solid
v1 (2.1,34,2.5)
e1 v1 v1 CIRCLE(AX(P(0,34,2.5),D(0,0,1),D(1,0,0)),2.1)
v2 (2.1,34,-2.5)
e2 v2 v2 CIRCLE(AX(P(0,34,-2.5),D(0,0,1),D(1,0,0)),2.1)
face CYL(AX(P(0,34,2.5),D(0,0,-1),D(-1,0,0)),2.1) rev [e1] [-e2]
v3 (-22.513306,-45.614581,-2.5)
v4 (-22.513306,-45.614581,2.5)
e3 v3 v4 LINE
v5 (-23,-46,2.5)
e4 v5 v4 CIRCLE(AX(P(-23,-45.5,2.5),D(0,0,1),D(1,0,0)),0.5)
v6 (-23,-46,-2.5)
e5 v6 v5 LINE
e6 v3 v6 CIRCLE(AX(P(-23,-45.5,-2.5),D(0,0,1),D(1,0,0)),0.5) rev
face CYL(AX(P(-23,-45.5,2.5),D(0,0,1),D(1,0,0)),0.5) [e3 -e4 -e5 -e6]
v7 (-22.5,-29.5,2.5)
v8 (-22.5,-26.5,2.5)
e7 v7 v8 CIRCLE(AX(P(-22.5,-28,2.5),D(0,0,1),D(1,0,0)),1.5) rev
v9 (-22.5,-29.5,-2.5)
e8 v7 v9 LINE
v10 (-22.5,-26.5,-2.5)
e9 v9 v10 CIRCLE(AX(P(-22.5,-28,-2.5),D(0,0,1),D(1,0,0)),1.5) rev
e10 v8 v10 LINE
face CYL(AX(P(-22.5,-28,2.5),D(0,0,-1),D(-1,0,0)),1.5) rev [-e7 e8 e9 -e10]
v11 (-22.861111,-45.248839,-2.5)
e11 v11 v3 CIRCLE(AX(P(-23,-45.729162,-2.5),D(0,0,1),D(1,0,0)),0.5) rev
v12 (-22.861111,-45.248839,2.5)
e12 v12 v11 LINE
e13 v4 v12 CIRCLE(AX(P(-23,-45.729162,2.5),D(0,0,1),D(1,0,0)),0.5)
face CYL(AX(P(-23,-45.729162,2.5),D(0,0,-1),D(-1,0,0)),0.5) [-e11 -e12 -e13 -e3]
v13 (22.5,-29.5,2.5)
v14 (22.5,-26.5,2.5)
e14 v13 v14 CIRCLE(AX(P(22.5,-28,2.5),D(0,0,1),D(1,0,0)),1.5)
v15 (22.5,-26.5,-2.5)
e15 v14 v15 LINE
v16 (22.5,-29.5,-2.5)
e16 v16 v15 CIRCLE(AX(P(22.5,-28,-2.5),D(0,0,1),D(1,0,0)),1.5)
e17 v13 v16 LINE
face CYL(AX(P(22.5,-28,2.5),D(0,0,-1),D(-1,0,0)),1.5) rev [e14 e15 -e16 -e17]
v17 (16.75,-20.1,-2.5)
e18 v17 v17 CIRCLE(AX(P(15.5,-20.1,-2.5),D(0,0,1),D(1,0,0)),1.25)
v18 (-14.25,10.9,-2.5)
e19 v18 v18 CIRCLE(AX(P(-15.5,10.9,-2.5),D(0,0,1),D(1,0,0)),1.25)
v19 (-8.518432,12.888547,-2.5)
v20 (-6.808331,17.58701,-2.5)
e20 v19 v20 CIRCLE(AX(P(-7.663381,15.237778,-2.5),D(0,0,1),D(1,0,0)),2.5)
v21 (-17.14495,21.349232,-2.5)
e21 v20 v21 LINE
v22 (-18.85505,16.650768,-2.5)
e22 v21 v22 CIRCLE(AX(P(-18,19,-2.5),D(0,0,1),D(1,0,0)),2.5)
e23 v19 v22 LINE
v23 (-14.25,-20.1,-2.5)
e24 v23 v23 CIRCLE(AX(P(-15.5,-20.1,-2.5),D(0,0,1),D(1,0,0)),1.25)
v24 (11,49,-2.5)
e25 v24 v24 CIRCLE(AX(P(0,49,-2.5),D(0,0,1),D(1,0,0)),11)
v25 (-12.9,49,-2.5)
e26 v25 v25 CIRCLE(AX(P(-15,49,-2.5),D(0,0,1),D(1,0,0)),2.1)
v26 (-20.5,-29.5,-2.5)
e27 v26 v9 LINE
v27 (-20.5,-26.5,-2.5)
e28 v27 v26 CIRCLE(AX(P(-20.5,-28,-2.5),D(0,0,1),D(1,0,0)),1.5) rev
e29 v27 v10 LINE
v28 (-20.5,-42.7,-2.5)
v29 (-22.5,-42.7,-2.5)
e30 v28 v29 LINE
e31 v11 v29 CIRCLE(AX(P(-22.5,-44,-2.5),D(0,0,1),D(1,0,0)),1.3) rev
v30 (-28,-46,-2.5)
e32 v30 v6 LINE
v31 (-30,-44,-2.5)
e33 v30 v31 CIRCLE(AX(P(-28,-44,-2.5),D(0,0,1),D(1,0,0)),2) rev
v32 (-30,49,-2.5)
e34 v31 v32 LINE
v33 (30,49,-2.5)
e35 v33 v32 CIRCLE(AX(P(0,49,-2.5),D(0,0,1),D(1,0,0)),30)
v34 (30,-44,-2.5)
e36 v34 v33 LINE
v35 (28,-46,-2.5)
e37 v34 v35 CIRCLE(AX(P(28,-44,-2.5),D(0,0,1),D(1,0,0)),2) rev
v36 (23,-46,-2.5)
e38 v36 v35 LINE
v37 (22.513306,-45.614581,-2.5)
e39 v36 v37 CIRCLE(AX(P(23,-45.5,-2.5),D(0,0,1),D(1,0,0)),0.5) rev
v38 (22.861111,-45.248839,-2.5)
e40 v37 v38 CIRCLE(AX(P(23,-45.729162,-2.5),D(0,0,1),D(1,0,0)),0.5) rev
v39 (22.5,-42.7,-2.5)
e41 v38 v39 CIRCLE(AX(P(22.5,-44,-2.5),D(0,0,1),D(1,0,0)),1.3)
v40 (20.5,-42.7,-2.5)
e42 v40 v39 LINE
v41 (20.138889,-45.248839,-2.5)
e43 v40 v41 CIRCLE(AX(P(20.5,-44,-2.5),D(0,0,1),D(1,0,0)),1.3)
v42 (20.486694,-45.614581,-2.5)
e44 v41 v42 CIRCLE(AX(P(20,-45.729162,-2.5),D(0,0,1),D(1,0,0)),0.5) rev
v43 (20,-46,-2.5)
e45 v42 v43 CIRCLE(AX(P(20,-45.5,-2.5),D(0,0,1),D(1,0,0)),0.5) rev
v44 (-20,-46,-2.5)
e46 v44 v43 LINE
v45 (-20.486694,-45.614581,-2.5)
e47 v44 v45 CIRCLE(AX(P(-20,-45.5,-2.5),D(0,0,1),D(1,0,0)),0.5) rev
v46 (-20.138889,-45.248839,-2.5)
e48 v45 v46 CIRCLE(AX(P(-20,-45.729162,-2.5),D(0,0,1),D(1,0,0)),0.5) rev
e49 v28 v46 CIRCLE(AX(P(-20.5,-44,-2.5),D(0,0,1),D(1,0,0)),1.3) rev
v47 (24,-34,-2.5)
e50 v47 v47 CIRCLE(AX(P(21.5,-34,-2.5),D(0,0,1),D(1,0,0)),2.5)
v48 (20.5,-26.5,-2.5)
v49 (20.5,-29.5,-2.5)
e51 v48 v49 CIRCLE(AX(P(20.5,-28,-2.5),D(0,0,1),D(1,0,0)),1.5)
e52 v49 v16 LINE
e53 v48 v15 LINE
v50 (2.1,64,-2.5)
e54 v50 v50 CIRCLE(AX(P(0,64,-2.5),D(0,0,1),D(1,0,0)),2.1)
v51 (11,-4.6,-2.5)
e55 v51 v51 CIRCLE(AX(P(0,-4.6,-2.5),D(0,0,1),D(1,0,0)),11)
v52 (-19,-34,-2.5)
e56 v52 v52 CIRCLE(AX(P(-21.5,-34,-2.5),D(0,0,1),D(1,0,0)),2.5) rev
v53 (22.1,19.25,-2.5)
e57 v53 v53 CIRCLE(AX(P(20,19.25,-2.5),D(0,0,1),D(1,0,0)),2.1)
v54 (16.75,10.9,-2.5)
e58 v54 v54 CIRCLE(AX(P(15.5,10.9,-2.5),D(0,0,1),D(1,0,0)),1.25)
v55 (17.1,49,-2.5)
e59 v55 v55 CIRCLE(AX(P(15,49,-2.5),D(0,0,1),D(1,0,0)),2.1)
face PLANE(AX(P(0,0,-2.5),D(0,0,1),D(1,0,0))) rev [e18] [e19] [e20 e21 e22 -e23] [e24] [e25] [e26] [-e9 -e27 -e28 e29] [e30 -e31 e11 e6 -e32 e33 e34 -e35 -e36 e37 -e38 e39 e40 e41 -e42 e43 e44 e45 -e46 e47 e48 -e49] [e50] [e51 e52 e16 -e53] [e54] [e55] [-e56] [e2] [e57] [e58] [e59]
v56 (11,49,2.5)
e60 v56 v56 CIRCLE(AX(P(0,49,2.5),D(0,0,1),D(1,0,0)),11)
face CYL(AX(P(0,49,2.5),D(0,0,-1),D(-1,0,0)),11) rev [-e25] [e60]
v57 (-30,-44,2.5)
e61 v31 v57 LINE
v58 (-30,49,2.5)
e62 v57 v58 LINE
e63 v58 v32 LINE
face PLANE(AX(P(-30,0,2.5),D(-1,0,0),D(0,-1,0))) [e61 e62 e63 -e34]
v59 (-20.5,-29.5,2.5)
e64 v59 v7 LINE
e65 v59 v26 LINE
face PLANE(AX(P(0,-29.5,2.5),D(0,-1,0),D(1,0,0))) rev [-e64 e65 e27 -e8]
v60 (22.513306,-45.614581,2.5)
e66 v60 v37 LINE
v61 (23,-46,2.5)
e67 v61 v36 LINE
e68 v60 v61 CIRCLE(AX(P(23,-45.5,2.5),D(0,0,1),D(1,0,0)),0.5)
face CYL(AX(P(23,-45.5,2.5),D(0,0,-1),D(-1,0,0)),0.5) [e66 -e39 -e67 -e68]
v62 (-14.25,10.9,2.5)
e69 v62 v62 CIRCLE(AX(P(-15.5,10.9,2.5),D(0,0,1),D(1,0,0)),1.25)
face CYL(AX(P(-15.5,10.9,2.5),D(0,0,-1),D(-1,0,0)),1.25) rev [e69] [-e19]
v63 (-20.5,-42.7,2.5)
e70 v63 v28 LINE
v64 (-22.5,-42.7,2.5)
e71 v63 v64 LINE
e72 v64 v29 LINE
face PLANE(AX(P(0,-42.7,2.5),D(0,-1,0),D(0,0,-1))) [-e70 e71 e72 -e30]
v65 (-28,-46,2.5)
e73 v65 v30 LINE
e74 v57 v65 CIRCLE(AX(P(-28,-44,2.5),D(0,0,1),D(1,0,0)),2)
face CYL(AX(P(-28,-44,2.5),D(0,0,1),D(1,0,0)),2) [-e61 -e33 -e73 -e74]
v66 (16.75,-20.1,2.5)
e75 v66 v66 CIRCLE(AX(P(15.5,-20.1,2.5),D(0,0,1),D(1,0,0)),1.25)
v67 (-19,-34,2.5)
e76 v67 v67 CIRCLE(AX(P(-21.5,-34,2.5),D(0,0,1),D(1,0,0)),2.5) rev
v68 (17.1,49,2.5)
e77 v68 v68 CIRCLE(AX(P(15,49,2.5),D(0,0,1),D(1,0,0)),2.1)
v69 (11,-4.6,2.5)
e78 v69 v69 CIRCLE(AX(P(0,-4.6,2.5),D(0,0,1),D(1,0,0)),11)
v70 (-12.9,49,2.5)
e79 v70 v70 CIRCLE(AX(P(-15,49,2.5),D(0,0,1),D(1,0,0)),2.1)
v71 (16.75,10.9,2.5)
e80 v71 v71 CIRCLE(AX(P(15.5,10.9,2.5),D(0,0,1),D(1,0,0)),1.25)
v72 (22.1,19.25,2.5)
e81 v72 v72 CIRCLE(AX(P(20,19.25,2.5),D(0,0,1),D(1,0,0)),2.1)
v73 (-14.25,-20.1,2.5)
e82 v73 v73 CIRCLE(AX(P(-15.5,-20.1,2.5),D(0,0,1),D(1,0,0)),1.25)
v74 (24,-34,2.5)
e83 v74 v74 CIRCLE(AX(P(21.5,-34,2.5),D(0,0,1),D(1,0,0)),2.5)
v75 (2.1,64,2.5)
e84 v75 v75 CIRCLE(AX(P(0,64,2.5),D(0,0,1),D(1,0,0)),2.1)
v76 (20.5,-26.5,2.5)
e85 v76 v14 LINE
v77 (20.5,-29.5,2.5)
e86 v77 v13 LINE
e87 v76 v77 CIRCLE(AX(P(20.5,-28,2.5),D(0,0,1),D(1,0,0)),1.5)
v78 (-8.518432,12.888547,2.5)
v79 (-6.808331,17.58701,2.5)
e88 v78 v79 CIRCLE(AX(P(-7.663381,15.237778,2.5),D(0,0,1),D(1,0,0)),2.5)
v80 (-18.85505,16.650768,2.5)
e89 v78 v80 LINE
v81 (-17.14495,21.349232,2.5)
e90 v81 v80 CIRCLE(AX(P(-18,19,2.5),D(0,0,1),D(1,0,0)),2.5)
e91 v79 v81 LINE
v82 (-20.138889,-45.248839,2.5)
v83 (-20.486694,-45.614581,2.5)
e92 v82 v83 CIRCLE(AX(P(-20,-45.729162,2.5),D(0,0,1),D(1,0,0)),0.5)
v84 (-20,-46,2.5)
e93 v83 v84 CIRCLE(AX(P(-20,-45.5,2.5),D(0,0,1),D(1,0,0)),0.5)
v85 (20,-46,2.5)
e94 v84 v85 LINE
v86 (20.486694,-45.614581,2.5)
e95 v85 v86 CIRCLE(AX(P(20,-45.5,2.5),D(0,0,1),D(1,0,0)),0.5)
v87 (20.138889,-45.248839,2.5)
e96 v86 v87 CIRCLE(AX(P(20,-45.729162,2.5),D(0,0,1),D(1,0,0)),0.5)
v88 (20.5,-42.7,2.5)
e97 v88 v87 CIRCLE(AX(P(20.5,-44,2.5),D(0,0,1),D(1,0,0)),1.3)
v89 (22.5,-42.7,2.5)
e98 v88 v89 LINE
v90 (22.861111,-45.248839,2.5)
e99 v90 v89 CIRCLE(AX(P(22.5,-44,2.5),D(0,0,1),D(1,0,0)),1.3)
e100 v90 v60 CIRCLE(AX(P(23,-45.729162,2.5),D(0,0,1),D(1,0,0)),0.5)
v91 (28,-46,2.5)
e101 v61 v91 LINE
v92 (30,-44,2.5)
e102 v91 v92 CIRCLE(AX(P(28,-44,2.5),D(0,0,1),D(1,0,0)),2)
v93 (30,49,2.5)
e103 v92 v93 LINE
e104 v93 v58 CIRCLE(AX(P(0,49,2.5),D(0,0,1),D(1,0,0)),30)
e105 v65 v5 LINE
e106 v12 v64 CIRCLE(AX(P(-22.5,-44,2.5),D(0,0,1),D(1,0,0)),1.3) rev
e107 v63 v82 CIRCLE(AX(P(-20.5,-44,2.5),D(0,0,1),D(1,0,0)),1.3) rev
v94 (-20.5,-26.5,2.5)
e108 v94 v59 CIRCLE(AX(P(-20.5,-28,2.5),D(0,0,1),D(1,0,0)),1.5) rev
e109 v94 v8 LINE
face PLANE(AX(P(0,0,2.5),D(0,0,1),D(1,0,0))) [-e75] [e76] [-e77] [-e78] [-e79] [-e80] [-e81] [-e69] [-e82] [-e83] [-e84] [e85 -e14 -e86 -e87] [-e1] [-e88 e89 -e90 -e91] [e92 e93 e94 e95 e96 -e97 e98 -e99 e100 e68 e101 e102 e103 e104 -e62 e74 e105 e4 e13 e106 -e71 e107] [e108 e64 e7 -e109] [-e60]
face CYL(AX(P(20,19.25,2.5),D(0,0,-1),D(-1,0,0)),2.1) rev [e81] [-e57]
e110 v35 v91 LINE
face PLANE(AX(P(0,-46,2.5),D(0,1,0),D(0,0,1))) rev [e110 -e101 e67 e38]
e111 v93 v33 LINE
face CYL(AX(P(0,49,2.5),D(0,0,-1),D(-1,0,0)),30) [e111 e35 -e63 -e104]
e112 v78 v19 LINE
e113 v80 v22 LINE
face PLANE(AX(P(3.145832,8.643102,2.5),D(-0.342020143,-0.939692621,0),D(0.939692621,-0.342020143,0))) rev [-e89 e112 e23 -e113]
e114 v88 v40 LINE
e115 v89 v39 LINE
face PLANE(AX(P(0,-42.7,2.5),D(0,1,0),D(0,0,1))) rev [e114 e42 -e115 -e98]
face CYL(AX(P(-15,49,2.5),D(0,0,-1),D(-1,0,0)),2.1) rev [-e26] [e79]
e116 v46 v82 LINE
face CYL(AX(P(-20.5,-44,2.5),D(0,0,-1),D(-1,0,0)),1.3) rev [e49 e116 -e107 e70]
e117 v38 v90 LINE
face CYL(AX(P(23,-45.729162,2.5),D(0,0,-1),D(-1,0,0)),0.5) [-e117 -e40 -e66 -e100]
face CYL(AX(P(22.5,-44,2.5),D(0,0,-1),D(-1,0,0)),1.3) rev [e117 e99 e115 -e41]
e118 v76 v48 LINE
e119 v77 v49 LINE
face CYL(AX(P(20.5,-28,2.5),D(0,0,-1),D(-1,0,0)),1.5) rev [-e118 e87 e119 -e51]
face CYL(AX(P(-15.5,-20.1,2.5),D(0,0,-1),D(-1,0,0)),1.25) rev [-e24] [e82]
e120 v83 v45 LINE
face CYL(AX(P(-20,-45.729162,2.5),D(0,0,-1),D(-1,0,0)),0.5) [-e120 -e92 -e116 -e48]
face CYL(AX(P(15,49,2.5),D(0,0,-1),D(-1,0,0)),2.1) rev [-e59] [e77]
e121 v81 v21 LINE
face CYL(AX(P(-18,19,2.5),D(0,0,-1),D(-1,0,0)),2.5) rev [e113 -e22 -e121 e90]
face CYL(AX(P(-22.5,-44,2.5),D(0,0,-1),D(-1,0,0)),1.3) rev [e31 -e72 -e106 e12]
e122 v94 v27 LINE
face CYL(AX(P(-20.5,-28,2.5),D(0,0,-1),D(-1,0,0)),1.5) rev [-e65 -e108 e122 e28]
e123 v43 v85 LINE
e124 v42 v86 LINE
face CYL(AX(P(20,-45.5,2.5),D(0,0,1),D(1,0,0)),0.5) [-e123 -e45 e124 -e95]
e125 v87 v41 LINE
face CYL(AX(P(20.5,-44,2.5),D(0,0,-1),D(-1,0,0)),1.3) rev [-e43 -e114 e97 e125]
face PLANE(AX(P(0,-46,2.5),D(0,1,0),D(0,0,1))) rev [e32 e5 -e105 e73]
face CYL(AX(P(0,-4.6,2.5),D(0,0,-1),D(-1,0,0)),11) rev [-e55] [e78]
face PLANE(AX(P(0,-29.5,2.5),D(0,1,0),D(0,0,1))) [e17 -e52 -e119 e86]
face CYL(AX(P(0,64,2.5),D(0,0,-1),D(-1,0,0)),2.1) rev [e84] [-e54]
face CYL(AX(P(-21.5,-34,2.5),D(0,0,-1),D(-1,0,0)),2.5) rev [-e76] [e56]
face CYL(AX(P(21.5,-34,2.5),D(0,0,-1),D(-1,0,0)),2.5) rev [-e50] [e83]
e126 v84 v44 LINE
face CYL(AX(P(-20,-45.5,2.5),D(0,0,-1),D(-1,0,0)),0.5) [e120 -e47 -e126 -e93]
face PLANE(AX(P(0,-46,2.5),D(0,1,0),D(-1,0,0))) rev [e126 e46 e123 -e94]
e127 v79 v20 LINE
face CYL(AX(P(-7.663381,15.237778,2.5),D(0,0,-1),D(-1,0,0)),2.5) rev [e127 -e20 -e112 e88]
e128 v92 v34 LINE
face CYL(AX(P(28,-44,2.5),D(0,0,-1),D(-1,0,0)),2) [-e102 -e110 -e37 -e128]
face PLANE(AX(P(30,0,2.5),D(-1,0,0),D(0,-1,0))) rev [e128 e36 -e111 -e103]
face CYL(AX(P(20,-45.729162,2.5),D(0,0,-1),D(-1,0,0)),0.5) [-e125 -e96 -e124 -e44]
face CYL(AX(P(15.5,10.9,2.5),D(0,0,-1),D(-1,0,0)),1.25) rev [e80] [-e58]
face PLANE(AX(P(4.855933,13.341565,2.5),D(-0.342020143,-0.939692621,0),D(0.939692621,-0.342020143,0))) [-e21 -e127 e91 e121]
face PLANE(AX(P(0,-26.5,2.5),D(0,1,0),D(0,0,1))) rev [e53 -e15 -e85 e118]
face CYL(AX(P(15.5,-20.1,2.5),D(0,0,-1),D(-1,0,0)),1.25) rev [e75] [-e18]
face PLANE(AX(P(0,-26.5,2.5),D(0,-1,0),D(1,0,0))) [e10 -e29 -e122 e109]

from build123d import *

# Parameters (mm, degrees)
SKETCH1_R           = 11
SKETCH1_R_2         = 1.25
SKETCH1_R_3         = 2.5
SKETCH1_R_4         = 2.1
BOSS_EXTRUDE1_DEPTH = 2.5
FILLET1_R           = 0.5
FILLET2_R           = 2


with BuildPart() as part:
    # Sketch1 → Boss-Extrude1 (new, symmetric)
    with BuildSketch(Plane.XY):
        with BuildLine():
            Line((-30, -46), (-22.5, -46))
            Line((-22.5, -46), (-22.5, -45.3))
            ThreePointArc((-22.5, -45.3), (-23.8, -44), (-22.5, -42.7))
            Line((-22.5, -42.7), (-20.5, -42.7))
            ThreePointArc((-20.5, -42.7), (-19.2, -44), (-20.5, -45.3))
            Line((-20.5, -45.3), (-20.5, -46))
            Line((-20.5, -46), (20.5, -46))
            Line((20.5, -46), (20.5, -45.3))
            ThreePointArc((20.5, -45.3), (19.2, -44), (20.5, -42.7))
            Line((20.5, -42.7), (22.5, -42.7))
            ThreePointArc((22.5, -42.7), (23.8, -44), (22.5, -45.3))
            Line((22.5, -45.3), (22.5, -46))
            Line((22.5, -46), (30, -46))
            Line((30, -46), (30, 49))
            ThreePointArc((30, 49), (0, 79), (-30, 49))
            Line((-30, 49), (-30, -46))
        make_face()
        with Locations((0, -4.6)):
            Circle(SKETCH1_R, mode=Mode.SUBTRACT)
        with Locations((15.5, 10.9)):
            Circle(SKETCH1_R_2, mode=Mode.SUBTRACT)
        with Locations((15.5, -20.1)):
            Circle(SKETCH1_R_2, mode=Mode.SUBTRACT)
        with Locations((-15.5, -20.1)):
            Circle(SKETCH1_R_2, mode=Mode.SUBTRACT)
        with Locations((-15.5, 10.9)):
            Circle(SKETCH1_R_2, mode=Mode.SUBTRACT)
        with Locations((0, 49)):
            Circle(SKETCH1_R, mode=Mode.SUBTRACT)
        with Locations((21.5, -34)):
            Circle(SKETCH1_R_3, mode=Mode.SUBTRACT)
        with Locations((-21.5, -34)):
            Circle(SKETCH1_R_3, mode=Mode.SUBTRACT)
        with Locations((0, 64)):
            Circle(SKETCH1_R_4, mode=Mode.SUBTRACT)
        with Locations((-15, 49)):
            Circle(SKETCH1_R_4, mode=Mode.SUBTRACT)
        with Locations((0, 34)):
            Circle(SKETCH1_R_4, mode=Mode.SUBTRACT)
        with Locations((15, 49)):
            Circle(SKETCH1_R_4, mode=Mode.SUBTRACT)
        with Locations((20, 19.25)):
            Circle(SKETCH1_R_4, mode=Mode.SUBTRACT)
        with BuildLine():
            Line((20.5, -26.5), (22.5, -26.5))
            ThreePointArc((22.5, -26.5), (24, -28), (22.5, -29.5))
            Line((22.5, -29.5), (20.5, -29.5))
            ThreePointArc((20.5, -29.5), (19, -28), (20.5, -26.5))
        make_face(mode=Mode.SUBTRACT)
        with BuildLine():
            Line((-20.5, -26.5), (-22.5, -26.5))
            ThreePointArc((-22.5, -26.5), (-24, -28), (-22.5, -29.5))
            Line((-22.5, -29.5), (-20.5, -29.5))
            ThreePointArc((-20.5, -29.5), (-19, -28), (-20.5, -26.5))
        make_face(mode=Mode.SUBTRACT)
        with BuildLine():
            Line((-8.51843153, 12.888546871), (-18.855050358, 16.650768448))
            ThreePointArc((-18.855050358, 16.650768448), (-20.349231552, 19.855050358), (-17.144949642, 21.349231552))
            Line((-17.144949642, 21.349231552), (-6.808330813, 17.587009975))
            ThreePointArc((-6.808330813, 17.587009975), (-5.314149619, 14.382728065), (-8.51843153, 12.888546871))
        make_face(mode=Mode.SUBTRACT)
    extrude(amount=BOSS_EXTRUDE1_DEPTH, both=True)

    # Fillet1
    # the kernel refuses this fillet: 0.5 mm, written as the material it takes off along each edge
    with BuildSketch(Plane(origin=(-22.5, -46, -3.75), x_dir=(0, 1, 0), z_dir=(0, 0, 1)), Plane(origin=(-20.5, -46, -3.75), x_dir=(1, 0, 0), z_dir=(0, 0, 1)), Plane(origin=(20.5, -46, -3.75), x_dir=(0, 1, 0), z_dir=(0, 0, 1)), Plane(origin=(22.5, -46, -3.75), x_dir=(1, 0, 0), z_dir=(0, 0, 1))) as fillet1_piece_1:
        with BuildLine():
            CenterArc((FILLET1_R, FILLET1_R), FILLET1_R, 180, 90)
            Line((0, FILLET1_R), (0, 0))
            Line((0, 0), (FILLET1_R, 0))
        make_face()
    extrude(amount=7.5, mode=Mode.SUBTRACT)
    with BuildSketch(Plane(origin=(-22.5, -45.3, -3.572904116), x_dir=(-0.990112458059838, 0.14027587246103826, 0), z_dir=(0, 0, 1))) as fillet1_piece_2:
        with BuildLine():
            CenterArc((0.434855205, 0.495056229), FILLET1_R, 188.063810107, 73.872379787)
            Line((-0.060201024, 0.424918293), (0, 0))
            ThreePointArc((0, 0), (0.182358634, 0.012853805), (0.364717268, 0))
        make_face()
    extrude(amount=7.145808233, mode=Mode.SUBTRACT)
    with BuildSketch(Plane(origin=(-20.5, -45.3, -3.572904116), x_dir=(0, -1, 0), z_dir=(0, 0, 1))) as fillet1_piece_3:
        with BuildLine():
            CenterArc((0.429161647, 0.5), FILLET1_R, 196.127620213, 73.872379787)
            ThreePointArc((-0.051161033, 0.361111111), (-0.012853805, 0.182358634), (0, 0))
            Line((0, 0), (0.429161647, 0))
        make_face()
    extrude(amount=7.145808233, mode=Mode.SUBTRACT)
    with BuildSketch(Plane(origin=(20.5, -45.3, 3.572904116), x_dir=(-0.9901124580598404, 0.14027587246102047, 0), z_dir=(0, 0, -1)), Plane(origin=(22.5, -45.3, -3.572904116), x_dir=(0.9901124580598378, 0.1402758724610396, 0), z_dir=(0, 0, 1))) as fillet1_piece_4:
        with BuildLine():
            CenterArc((0.434855205, -0.495056229), FILLET1_R, 98.063810107, 73.872379787)
            Line((-0.060201024, -0.424918293), (0, 0))
            ThreePointArc((0, 0), (0.182358634, -0.012853805), (0.364717268, 0))
        make_face()
    extrude(amount=7.145808233, mode=Mode.SUBTRACT)

    # Fillet2
    fillet2_edges = [part.edges().sort_by_distance(p)[0] for p in [
        (30, -46, 0),
        (-30, -46, 0),
    ]]
    fillet(fillet2_edges, radius=FILLET2_R)


solid = part.part
